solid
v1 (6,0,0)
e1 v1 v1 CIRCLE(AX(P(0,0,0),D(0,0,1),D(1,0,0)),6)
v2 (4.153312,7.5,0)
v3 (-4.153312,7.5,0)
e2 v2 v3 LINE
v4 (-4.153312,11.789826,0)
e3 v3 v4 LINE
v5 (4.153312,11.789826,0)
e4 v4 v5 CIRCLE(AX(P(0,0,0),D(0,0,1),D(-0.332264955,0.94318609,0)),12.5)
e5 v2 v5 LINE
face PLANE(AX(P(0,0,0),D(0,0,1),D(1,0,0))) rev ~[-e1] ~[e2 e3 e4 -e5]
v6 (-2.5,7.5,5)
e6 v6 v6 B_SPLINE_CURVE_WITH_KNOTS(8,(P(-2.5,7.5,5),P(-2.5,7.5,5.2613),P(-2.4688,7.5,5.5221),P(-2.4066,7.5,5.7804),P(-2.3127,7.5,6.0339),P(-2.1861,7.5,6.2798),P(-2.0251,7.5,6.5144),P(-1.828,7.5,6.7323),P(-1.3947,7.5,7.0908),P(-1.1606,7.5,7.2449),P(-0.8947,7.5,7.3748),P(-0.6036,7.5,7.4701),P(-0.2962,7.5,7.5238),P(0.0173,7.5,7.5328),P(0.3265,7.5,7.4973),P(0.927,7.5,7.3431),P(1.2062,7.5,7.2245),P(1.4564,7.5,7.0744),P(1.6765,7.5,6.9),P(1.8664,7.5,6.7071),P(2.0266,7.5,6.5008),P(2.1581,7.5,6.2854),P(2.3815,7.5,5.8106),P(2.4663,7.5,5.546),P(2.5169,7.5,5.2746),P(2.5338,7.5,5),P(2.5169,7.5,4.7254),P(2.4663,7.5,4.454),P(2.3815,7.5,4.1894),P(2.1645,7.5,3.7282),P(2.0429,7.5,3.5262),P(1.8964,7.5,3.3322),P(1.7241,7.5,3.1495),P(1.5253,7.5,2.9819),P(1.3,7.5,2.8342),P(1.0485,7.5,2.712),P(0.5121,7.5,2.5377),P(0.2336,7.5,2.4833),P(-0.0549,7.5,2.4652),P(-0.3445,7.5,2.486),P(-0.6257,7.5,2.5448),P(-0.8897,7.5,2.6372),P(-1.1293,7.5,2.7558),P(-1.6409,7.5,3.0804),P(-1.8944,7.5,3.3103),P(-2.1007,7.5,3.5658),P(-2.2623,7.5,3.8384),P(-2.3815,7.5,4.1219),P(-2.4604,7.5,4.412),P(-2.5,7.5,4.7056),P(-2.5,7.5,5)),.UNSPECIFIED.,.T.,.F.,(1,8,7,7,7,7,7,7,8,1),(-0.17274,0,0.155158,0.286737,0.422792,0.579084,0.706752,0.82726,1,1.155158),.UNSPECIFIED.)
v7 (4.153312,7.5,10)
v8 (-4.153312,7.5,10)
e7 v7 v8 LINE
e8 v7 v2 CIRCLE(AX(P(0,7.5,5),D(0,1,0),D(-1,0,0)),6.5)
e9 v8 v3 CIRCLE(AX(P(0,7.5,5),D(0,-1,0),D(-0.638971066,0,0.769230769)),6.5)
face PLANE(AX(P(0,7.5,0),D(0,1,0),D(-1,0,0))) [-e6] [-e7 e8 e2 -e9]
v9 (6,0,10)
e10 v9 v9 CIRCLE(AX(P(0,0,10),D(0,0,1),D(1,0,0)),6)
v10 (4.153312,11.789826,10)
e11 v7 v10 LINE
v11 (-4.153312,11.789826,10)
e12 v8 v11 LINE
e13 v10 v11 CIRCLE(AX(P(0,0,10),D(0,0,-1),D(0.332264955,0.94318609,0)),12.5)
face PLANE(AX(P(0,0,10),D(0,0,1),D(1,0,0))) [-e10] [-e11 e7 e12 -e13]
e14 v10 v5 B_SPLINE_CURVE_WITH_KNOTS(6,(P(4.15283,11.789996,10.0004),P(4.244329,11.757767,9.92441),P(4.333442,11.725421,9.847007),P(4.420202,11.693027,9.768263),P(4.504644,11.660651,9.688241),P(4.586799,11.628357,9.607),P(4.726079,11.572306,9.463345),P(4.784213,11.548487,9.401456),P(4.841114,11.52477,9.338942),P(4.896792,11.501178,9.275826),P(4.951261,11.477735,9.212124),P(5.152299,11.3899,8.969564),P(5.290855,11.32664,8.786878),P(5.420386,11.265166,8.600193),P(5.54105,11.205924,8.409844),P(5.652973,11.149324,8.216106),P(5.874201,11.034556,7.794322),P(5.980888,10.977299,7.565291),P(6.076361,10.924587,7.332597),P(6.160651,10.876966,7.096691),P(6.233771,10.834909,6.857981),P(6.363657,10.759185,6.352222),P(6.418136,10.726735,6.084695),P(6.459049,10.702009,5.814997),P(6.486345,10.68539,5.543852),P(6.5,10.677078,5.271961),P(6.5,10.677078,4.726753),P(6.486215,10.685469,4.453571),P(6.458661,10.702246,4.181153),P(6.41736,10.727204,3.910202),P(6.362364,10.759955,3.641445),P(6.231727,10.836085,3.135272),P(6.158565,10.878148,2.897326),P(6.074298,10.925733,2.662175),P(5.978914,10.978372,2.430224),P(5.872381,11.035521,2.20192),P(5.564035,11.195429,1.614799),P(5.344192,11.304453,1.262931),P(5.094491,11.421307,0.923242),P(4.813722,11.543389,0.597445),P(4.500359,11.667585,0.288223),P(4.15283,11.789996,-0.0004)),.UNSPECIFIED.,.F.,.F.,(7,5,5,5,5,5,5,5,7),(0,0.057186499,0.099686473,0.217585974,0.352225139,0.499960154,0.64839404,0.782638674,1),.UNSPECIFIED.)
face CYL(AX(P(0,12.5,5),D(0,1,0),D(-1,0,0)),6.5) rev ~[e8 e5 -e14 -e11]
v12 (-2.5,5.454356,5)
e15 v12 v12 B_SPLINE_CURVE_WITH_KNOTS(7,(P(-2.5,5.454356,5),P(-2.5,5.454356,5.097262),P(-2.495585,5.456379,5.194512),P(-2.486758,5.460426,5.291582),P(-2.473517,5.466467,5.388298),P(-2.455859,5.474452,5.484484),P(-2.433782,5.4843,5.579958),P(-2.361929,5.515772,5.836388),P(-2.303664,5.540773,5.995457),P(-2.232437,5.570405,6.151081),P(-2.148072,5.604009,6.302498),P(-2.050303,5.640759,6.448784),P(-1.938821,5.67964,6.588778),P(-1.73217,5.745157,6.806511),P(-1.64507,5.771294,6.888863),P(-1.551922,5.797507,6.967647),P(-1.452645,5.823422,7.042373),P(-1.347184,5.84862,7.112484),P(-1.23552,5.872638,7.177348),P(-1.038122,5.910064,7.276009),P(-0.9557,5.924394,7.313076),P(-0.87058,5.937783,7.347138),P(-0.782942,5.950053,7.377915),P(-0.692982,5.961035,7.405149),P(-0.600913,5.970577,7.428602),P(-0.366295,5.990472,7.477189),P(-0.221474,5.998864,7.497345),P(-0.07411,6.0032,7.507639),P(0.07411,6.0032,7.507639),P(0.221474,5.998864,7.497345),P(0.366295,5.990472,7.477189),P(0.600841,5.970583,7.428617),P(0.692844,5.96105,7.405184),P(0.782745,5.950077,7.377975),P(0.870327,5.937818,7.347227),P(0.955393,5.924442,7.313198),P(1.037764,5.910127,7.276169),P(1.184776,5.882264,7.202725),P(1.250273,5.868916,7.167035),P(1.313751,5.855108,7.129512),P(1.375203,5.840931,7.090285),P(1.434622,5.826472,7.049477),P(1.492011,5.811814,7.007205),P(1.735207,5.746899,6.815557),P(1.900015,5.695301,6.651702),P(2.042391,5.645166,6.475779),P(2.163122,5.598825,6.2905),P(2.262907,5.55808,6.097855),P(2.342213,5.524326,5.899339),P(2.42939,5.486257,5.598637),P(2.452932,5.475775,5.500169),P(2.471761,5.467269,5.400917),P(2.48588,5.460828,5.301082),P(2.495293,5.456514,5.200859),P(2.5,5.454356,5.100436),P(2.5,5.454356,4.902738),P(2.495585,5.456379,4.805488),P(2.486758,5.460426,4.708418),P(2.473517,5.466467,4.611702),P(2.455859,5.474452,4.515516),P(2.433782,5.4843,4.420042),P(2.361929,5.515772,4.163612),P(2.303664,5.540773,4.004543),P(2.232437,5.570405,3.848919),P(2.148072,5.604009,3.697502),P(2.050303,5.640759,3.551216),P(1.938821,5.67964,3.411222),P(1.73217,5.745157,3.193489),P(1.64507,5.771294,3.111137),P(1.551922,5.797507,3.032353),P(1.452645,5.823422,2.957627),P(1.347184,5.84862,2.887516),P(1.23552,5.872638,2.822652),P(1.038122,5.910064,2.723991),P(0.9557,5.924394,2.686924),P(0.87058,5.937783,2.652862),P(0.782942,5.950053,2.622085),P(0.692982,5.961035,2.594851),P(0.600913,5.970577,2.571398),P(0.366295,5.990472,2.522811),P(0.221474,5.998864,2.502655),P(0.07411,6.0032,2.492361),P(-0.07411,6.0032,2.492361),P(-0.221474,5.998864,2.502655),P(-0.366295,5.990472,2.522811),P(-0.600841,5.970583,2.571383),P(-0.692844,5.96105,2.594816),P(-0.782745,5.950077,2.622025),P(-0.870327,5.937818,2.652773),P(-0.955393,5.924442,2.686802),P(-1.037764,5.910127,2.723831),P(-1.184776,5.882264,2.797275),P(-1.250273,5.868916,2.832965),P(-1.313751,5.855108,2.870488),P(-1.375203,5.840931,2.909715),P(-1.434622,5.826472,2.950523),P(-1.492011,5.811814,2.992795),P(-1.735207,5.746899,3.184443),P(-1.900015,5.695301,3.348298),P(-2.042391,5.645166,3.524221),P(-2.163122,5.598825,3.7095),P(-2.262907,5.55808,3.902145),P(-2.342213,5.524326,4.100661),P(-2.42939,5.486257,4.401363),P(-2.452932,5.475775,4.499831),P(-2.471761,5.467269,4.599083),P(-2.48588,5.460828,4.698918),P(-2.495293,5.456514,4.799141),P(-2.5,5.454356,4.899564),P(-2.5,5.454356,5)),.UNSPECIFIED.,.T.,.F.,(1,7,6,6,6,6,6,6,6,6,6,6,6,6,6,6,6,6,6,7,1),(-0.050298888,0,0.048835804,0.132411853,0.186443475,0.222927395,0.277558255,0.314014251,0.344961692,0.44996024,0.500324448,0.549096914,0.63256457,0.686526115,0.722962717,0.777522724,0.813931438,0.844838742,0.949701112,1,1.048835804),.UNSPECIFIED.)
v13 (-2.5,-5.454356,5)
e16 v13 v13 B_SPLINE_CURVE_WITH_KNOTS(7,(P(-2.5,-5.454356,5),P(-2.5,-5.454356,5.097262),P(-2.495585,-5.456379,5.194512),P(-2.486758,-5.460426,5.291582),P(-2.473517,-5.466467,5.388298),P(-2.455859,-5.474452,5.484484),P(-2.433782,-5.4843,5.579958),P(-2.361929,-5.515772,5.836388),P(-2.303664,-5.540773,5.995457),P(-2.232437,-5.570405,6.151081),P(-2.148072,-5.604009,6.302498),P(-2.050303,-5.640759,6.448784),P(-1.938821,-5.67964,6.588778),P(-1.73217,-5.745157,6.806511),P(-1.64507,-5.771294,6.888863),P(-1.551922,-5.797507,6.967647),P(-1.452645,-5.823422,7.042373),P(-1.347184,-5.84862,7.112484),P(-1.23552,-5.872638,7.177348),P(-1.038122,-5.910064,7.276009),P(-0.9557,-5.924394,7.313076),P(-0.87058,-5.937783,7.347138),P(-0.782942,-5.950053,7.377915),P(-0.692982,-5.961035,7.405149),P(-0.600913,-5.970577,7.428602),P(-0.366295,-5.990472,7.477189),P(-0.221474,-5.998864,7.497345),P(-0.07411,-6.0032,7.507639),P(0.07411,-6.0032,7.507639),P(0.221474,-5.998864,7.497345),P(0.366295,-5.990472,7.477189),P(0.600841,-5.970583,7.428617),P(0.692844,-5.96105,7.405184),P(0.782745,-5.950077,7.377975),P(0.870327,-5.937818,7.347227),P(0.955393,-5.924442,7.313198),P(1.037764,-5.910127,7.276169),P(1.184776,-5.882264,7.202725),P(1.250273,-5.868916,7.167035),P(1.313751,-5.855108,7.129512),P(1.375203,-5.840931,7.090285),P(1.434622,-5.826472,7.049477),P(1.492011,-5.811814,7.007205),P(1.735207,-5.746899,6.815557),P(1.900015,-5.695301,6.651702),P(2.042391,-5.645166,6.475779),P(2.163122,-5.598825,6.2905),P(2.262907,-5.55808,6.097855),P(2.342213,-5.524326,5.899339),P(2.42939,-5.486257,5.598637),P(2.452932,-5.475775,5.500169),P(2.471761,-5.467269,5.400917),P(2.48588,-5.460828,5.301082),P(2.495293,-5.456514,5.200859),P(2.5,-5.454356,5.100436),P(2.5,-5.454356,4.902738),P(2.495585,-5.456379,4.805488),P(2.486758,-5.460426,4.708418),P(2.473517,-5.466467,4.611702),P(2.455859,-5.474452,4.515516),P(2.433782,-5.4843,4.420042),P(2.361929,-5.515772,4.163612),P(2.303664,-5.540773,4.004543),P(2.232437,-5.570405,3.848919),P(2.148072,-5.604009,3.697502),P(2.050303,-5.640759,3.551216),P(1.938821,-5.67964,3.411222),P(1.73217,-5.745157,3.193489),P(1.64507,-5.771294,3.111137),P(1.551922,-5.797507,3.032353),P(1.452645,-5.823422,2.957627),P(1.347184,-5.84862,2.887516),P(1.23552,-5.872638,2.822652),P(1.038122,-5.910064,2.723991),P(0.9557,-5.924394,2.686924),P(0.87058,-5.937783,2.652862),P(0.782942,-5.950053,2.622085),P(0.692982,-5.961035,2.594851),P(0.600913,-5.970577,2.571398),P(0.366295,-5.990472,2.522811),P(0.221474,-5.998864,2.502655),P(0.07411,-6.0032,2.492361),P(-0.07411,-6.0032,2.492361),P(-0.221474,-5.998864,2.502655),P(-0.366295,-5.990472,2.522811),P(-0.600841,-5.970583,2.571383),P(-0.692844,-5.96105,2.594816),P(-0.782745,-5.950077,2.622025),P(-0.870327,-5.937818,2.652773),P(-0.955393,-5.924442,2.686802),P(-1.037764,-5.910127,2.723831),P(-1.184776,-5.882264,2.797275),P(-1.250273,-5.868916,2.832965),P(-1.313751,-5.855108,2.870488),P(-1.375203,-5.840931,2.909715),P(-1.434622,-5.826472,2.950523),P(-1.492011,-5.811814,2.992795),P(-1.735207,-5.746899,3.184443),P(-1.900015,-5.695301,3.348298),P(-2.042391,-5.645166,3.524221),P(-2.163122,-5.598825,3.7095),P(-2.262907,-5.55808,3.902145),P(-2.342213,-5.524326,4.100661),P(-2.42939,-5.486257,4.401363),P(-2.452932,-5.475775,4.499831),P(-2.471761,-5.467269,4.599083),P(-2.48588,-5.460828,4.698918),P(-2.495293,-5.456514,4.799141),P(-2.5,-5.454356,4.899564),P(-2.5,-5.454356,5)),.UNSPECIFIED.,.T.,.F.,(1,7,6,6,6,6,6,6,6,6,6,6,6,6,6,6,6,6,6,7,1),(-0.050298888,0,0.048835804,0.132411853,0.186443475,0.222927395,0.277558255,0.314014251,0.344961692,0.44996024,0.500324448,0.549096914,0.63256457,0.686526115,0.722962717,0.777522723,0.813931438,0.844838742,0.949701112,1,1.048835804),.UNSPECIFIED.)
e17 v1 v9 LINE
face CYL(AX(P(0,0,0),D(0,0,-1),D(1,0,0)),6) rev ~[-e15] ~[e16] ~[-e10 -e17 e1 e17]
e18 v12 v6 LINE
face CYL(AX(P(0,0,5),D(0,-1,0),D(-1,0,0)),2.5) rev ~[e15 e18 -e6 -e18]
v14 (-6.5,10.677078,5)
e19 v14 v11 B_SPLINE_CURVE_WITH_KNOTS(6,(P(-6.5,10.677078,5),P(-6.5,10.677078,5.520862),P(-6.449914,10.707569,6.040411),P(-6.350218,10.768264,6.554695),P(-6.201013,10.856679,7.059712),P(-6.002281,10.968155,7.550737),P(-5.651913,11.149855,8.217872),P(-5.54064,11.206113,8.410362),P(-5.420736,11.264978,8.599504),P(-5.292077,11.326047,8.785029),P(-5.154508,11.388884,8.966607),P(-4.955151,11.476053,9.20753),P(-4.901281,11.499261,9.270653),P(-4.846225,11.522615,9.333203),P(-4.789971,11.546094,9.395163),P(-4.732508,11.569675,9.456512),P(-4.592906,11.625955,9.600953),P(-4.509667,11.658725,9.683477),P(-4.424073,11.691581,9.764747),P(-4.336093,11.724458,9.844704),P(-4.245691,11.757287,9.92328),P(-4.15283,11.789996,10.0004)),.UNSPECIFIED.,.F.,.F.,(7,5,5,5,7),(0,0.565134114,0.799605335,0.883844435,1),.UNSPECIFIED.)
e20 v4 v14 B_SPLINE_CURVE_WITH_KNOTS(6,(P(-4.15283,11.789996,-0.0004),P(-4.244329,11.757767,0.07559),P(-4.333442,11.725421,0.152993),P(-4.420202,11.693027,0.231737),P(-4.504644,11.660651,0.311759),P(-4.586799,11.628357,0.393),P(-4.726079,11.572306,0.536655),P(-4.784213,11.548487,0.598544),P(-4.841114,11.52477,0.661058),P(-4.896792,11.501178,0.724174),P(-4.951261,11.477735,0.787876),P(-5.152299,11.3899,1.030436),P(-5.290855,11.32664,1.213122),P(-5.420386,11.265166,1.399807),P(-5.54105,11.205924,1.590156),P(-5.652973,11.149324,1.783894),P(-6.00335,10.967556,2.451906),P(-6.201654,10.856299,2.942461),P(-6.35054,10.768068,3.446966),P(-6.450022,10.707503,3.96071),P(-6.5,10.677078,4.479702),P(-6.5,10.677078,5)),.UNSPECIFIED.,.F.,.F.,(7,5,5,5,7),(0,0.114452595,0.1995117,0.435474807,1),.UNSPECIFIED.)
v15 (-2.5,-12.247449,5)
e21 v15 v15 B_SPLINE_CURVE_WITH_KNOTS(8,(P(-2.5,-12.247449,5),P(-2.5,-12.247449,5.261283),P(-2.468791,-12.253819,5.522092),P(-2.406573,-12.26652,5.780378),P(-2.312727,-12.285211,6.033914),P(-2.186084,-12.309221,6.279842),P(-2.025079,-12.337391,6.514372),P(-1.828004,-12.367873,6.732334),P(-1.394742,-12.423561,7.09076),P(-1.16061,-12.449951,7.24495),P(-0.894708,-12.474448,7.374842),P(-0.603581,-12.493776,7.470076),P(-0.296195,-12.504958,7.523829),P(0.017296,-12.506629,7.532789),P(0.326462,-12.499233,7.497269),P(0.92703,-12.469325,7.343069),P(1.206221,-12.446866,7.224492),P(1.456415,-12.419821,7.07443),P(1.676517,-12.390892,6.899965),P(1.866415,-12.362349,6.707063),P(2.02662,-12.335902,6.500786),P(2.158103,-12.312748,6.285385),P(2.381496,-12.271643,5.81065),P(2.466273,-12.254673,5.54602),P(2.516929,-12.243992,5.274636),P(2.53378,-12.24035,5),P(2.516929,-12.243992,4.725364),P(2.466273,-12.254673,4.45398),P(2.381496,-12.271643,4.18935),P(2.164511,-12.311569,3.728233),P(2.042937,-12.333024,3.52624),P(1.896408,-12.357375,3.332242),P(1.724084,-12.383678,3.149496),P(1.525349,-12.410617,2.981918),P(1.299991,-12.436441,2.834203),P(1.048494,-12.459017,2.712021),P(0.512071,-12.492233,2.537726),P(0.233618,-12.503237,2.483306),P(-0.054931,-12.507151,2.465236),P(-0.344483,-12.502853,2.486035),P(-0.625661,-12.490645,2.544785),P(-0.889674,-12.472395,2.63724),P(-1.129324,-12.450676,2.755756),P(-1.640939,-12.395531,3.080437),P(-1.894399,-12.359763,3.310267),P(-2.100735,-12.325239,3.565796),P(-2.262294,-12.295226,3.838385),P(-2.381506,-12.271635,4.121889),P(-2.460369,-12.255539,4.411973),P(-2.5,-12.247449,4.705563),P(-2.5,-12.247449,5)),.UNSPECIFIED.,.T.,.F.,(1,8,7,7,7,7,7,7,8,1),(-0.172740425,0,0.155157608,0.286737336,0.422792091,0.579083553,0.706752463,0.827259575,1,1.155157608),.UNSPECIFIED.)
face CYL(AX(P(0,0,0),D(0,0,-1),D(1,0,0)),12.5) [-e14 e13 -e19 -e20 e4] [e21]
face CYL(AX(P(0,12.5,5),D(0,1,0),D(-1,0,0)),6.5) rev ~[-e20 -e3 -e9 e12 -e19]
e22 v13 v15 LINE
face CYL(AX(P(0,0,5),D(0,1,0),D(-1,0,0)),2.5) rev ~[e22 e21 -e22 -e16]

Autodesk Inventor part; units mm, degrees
ref_plane "YZ Plane" through (0, 0, 0) normal (1, 0, 0) x (0, 1, 0)
ref_plane "XY Plane" through (0, 0, 0) normal (0, 0, 1) x (1, 0, 0)
sketch "Sketch1" plane through (0, 0, 0) normal (0, 0, 1) x (1, 0, 0)
  circle A0 centre (0, 0) radius 6
  circle A1 centre (0, 0) radius 12.5
  dimension "d0" = 12
  dimension "d1" = 25
extrude "Extrusion1" add sketch "Sketch1" along normal blind 10
sketch "Sketch2" plane through (0, 0, 0) normal (0, 1, 0) x (-1, 0, 0)
  circle A0 centre (0, 5) radius 2.5
  line L0 (6, 0) -> (6, 10) projected
  point P0 (0, 0)
  point P1 (6, 5)
  dimension "d4" = 5
extrude "Extrusion2" cut sketch "Sketch2" along normal through all both and the other way through all
ref_plane "Work Plane1" through (0, 12.5, 0) normal (0, 1, 0) x (-1, 0, 0)
sketch "Sketch4" plane through (0, 12.5, 0) normal (0, 1, 0) x (-1, 0, 0)
  spline S0 degree 8 poles (2.5, 5) (2.5, 5.2613) (2.4688, 5.5221) (2.4066, 5.7804) (2.3127, 6.0339) (2.1861, 6.2798) (2.0251, 6.5144) (1.828, 6.7323) (1.3947, 7.0908) (1.1606, 7.2449) (0.8947, 7.3748) (0.6036, 7.4701) (0.2962, 7.5238) (-0.0173, 7.5328) (-0.3265, 7.4973) (-0.927, 7.3431) (-1.2062, 7.2245) (-1.4564, 7.0744) (-1.6765, 6.9) (-1.8664, 6.7071) (-2.0266, 6.5008) (-2.1581, 6.2854) (-2.3815, 5.8106) (-2.4663, 5.546) (-2.5169, 5.2746) (-2.5338, 5) (-2.5169, 4.7254) (-2.4663, 4.454) (-2.3815, 4.1894) (-2.1645, 3.7282) (-2.0429, 3.5262) (-1.8964, 3.3322) (-1.7241, 3.1495) (-1.5253, 2.9819) (-1.3, 2.8342) (-1.0485, 2.712) (-0.5121, 2.5377) (-0.2336, 2.4833) (0.0549, 2.4652) (0.3445, 2.486) (0.6257, 2.5448) (0.8897, 2.6372) (1.1293, 2.7558) (1.6409, 3.0804) (1.8944, 3.3103) (2.1007, 3.5658) (2.2623, 3.8384) (2.3815, 4.1219) (2.4604, 4.412) (2.5, 4.7056) (2.5, 5) knots 0 0 0 0 0 0 0 0 0 0.155158 0.155158 0.155158 0.155158 0.155158 0.155158 0.155158 0.286737 0.286737 0.286737 0.286737 0.286737 0.286737 0.286737 0.422792 0.422792 0.422792 0.422792 0.422792 0.422792 0.422792 0.579084 0.579084 0.579084 0.579084 0.579084 0.579084 0.579084 0.706752 0.706752 0.706752 0.706752 0.706752 0.706752 0.706752 0.82726 0.82726 0.82726 0.82726 0.82726 0.82726 0.82726 1 1 1 1 1 1 1 1 1 projected
  circle A0 centre (0, 5) radius 6.5
  point P0 (0, 0)
  dimension "d8" = 13
extrude "Extrusion3" cut sketch "Sketch4" against normal blind 5
properties part number "WA003.ip" material "ABS Plastic"
